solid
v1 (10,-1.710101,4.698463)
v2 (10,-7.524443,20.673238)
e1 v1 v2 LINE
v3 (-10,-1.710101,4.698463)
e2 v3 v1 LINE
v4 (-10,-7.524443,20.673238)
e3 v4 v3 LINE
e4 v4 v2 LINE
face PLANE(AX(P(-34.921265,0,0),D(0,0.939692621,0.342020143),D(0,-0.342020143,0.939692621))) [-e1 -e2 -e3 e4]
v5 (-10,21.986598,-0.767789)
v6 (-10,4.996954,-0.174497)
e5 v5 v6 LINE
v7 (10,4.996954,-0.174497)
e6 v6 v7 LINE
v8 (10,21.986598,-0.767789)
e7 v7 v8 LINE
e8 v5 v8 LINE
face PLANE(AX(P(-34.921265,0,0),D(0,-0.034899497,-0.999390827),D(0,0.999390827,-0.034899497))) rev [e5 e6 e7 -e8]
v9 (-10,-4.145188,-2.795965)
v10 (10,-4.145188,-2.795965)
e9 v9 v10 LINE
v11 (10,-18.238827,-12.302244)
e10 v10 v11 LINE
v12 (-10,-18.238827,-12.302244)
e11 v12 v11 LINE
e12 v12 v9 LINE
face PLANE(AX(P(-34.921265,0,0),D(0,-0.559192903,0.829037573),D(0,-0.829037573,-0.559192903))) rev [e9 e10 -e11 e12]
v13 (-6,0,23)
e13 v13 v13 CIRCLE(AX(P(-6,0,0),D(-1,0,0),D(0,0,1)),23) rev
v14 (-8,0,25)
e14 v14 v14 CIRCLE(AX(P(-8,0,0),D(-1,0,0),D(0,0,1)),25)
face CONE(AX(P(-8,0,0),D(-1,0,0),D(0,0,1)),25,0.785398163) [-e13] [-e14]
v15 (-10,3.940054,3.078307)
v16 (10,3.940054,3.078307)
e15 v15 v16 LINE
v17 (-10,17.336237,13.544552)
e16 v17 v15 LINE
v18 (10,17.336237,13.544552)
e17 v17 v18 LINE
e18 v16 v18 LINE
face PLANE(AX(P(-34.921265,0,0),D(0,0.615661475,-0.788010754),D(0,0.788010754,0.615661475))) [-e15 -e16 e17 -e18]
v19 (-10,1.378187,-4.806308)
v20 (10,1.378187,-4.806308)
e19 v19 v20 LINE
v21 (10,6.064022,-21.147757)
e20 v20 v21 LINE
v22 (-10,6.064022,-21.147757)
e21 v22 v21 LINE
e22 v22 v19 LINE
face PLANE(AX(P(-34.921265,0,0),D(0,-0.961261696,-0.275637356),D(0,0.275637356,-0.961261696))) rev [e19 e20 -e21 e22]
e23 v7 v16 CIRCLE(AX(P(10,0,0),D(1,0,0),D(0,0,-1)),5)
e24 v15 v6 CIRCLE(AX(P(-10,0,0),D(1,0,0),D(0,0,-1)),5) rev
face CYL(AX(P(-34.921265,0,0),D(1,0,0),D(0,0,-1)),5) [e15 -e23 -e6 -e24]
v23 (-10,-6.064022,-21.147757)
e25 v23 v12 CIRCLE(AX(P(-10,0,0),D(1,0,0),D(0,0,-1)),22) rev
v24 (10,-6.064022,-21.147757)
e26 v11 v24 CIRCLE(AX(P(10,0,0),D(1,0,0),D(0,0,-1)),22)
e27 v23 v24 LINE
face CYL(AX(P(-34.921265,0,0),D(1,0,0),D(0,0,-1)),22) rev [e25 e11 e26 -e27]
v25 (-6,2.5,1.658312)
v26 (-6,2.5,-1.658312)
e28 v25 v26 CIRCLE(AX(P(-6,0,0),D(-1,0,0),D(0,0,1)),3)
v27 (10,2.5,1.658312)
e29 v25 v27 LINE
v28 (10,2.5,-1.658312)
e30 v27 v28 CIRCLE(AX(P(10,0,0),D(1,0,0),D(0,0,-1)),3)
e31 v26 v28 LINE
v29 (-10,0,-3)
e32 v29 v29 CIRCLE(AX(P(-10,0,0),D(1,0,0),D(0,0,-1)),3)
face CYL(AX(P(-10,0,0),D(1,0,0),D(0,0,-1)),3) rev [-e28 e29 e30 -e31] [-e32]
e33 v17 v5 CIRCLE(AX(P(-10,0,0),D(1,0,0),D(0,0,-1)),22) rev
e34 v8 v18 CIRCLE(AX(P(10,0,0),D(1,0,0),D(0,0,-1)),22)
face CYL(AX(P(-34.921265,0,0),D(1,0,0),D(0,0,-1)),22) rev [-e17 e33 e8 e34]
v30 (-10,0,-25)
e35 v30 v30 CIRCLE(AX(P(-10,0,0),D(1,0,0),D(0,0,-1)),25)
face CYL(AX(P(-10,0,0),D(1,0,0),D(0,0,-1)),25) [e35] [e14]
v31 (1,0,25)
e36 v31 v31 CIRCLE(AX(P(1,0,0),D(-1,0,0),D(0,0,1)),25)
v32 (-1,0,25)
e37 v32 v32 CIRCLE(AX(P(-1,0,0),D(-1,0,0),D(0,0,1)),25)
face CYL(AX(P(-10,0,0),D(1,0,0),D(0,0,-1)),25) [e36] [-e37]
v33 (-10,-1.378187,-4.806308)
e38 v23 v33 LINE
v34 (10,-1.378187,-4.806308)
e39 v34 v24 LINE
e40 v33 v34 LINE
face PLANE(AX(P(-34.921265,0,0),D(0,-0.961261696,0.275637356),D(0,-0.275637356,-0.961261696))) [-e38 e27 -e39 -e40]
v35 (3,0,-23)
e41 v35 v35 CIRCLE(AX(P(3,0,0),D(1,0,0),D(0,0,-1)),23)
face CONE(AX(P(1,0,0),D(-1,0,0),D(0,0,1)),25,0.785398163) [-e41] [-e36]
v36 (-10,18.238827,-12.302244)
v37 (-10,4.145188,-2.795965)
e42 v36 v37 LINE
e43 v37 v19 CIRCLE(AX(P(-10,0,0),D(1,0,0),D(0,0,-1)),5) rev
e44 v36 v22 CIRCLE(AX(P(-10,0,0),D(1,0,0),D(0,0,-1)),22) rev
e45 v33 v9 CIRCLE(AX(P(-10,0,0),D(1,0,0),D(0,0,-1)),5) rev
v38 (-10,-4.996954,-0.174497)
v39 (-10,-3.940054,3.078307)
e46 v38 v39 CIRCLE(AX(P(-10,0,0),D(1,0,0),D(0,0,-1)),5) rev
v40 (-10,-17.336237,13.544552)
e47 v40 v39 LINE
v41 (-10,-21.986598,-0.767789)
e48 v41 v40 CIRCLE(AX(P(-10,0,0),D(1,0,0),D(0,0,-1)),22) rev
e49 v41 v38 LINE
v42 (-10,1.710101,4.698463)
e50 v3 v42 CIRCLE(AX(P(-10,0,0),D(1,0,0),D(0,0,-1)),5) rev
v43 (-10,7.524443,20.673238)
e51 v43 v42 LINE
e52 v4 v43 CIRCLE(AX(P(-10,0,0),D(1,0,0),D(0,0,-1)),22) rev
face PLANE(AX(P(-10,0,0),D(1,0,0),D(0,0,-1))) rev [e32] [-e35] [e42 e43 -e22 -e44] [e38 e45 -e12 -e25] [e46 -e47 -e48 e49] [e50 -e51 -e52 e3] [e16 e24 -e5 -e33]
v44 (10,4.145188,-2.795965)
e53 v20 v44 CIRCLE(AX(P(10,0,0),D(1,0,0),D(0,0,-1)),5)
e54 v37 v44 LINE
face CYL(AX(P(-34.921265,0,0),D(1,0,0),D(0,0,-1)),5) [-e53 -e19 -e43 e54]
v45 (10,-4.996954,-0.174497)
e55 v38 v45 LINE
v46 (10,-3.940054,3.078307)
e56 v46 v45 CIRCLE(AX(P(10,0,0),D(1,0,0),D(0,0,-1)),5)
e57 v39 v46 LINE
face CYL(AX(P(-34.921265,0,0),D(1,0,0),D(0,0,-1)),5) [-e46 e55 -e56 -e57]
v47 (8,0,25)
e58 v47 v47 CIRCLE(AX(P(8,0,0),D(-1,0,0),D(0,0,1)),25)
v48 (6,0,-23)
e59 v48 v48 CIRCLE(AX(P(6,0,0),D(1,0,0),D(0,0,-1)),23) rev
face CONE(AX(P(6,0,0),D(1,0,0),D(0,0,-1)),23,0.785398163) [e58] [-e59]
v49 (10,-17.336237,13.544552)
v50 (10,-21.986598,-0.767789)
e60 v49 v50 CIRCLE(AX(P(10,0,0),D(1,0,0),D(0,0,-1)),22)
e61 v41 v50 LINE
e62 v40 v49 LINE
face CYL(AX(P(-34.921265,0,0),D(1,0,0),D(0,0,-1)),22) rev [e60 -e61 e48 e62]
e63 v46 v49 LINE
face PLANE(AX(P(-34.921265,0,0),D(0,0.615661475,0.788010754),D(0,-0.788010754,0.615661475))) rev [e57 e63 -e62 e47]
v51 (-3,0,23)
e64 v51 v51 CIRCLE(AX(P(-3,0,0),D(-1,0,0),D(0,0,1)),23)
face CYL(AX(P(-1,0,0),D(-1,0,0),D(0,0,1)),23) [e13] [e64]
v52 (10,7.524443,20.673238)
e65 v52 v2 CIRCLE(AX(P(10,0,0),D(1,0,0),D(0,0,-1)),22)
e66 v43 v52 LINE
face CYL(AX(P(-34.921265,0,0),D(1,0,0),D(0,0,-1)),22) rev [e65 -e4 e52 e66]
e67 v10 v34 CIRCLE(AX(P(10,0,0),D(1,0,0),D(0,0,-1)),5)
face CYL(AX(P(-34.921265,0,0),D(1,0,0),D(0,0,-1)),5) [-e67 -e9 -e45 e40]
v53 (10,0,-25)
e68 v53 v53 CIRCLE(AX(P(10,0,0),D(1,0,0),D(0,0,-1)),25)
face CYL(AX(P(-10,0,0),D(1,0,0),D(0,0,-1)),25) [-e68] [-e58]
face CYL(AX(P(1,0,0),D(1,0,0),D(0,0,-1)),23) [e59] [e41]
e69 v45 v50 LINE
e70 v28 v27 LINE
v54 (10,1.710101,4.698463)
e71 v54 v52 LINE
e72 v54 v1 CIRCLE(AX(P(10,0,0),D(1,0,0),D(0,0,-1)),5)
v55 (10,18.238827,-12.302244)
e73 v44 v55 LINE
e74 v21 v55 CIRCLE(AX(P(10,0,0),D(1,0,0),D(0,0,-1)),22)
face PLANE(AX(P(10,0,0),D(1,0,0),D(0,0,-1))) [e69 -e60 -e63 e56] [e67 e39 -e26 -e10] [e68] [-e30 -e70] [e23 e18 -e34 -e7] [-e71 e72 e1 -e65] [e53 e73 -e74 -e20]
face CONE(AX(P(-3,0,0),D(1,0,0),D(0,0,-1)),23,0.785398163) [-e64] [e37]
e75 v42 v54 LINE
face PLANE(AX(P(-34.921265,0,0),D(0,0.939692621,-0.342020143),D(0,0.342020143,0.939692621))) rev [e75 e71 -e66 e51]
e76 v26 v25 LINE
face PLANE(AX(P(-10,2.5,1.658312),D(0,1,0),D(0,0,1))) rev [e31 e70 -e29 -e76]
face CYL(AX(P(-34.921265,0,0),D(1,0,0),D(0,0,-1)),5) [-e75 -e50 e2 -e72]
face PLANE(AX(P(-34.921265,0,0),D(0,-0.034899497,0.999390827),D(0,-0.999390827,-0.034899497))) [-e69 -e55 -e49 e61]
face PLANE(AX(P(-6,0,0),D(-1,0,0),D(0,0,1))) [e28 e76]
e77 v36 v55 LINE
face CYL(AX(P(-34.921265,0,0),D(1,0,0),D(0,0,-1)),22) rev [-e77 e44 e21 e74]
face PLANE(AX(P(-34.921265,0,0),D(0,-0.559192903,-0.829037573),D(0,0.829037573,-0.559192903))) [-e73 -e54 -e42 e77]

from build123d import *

# Parameters (mm, degrees)
BASE_DEPTH          = 10
BASE_DEPTH_BACK     = 10
ESQUISSE1_R         = 25
ESQUISSE2_R         = 25
ESQUISSE2_R_2       = 23
VIDE_GORGE_DEPTH    = 7
VIDE_JANTE_DEPTH    = 20
ESQUISSE6_R         = 3
VIDE_BLOC_AXE_DEPTH = 4
CHAN_SIZE           = 2


with BuildPart() as part:
    # Esquisse1 → BASE (new, two sides: drawn at the far end of the back side and taken through both)
    with BuildSketch(Plane(origin=(0, 0, 0), x_dir=(0, 0, -1), z_dir=(1, 0, 0)).offset(-BASE_DEPTH_BACK)):
        Circle(ESQUISSE1_R)
        with BuildLine():
            Line((-1.658312395, 2.5), (1.658312395, 2.5))
            ThreePointArc((1.658312395, 2.5), (0, -3), (-1.658312395, 2.5))
        make_face(mode=Mode.SUBTRACT)
    extrude(amount=BASE_DEPTH + BASE_DEPTH_BACK)

    # Esquisse2 → VIDE GORGE (cut)
    with BuildSketch(Plane.ZY.offset(8)):
        with Locations(Location((0, 0, 0), (0, 0, 180))):
            Circle(ESQUISSE2_R)
        Circle(ESQUISSE2_R_2, mode=Mode.SUBTRACT)
    vide_gorge = extrude(amount=-VIDE_GORGE_DEPTH, mode=Mode.SUBTRACT)

    # SYM GORGE: VIDE GORGE across plane
    add(vide_gorge.mirror(Plane(origin=(0, 0, 0), x_dir=(0, 0, 1), z_dir=(1, 0, 0))), mode=Mode.SUBTRACT)

    # Esquisse4 → VIDE JANTE (cut)
    with BuildSketch(Plane(origin=(10, 0, 0), x_dir=(0, 0, -1), z_dir=(1, 0, 0))):
        with BuildLine():
            Line((-22, 0), (-5, 0))
            ThreePointArc((-5, 0), (-4.924038765, 0.868240888), (-4.698463104, 1.710100717))
            Line((-4.698463104, 1.710100717), (-20.673237657, 7.524443153))
            ThreePointArc((-20.673237657, 7.524443153), (-21.665770566, 3.820259909), (-22, 0))
        make_face()
        with BuildLine():
            ThreePointArc((-4.698463104, -1.710100717), (-4.924038765, -0.868240888), (-5, 0))
            Line((-5, 0), (-22, 0))
            ThreePointArc((-22, 0), (-21.665770566, -3.820259909), (-20.673237657, -7.524443153))
            Line((-20.673237657, -7.524443153), (-4.698463104, -1.710100717))
        make_face()
        with BuildLine():
            Line((-13.544552457, 17.336236579), (-3.078307377, 3.940053768))
            ThreePointArc((-3.078307377, 3.940053768), (-1.545084972, 4.755282581), (0.174497484, 4.996954135))
            Line((0.174497484, 4.996954135), (0.767788927, 21.986598194))
            ThreePointArc((0.767788927, 21.986598194), (-6.798373876, 20.923243358), (-13.544552457, 17.336236579))
        make_face()
        with BuildLine():
            Line((12.302243876, 18.238826596), (2.795964517, 4.145187863))
            ThreePointArc((2.795964517, 4.145187863), (4.045084972, 2.938926261), (4.80630848, 1.378186779))
            Line((4.80630848, 1.378186779), (21.147757311, 6.064021828))
            ThreePointArc((21.147757311, 6.064021828), (17.798373876, 12.93127555), (12.302243876, 18.238826596))
        make_face()
        with BuildLine():
            ThreePointArc((4.80630848, -1.378186779), (4.045084972, -2.938926261), (2.795964517, -4.145187863))
            Line((2.795964517, -4.145187863), (12.302243876, -18.238826596))
            ThreePointArc((12.302243876, -18.238826596), (17.798373876, -12.93127555), (21.147757311, -6.064021828))
            Line((21.147757311, -6.064021828), (4.80630848, -1.378186779))
        make_face()
        with BuildLine():
            ThreePointArc((0.174497484, -4.996954135), (-1.545084972, -4.755282581), (-3.078307377, -3.940053768))
            Line((-3.078307377, -3.940053768), (-13.544552457, -17.336236579))
            ThreePointArc((-13.544552457, -17.336236579), (-6.798373876, -20.923243358), (0.767788927, -21.986598194))
            Line((0.767788927, -21.986598194), (0.174497484, -4.996954135))
        make_face()
    extrude(amount=-VIDE_JANTE_DEPTH, mode=Mode.SUBTRACT)

    # Esquisse6 → VIDE BLOC AXE (cut)
    with BuildSketch(Plane.ZY.offset(10)):
        with Locations(Location((0, 0, 0), (0, 0, 180))):
            Circle(ESQUISSE6_R)
    extrude(amount=-VIDE_BLOC_AXE_DEPTH, mode=Mode.SUBTRACT)

    # CHAN
    chan_edges = [part.edges().sort_by_distance(p)[0] for p in [
        (-1, 0, -23),
        (-8, 0, -23),
        (8, 0, -23),
        (1, 0, -23),
    ]]
    chamfer(chan_edges, length=CHAN_SIZE - 0.0001)  # a hair under: the kernel refuses the full size


solid = part.part
